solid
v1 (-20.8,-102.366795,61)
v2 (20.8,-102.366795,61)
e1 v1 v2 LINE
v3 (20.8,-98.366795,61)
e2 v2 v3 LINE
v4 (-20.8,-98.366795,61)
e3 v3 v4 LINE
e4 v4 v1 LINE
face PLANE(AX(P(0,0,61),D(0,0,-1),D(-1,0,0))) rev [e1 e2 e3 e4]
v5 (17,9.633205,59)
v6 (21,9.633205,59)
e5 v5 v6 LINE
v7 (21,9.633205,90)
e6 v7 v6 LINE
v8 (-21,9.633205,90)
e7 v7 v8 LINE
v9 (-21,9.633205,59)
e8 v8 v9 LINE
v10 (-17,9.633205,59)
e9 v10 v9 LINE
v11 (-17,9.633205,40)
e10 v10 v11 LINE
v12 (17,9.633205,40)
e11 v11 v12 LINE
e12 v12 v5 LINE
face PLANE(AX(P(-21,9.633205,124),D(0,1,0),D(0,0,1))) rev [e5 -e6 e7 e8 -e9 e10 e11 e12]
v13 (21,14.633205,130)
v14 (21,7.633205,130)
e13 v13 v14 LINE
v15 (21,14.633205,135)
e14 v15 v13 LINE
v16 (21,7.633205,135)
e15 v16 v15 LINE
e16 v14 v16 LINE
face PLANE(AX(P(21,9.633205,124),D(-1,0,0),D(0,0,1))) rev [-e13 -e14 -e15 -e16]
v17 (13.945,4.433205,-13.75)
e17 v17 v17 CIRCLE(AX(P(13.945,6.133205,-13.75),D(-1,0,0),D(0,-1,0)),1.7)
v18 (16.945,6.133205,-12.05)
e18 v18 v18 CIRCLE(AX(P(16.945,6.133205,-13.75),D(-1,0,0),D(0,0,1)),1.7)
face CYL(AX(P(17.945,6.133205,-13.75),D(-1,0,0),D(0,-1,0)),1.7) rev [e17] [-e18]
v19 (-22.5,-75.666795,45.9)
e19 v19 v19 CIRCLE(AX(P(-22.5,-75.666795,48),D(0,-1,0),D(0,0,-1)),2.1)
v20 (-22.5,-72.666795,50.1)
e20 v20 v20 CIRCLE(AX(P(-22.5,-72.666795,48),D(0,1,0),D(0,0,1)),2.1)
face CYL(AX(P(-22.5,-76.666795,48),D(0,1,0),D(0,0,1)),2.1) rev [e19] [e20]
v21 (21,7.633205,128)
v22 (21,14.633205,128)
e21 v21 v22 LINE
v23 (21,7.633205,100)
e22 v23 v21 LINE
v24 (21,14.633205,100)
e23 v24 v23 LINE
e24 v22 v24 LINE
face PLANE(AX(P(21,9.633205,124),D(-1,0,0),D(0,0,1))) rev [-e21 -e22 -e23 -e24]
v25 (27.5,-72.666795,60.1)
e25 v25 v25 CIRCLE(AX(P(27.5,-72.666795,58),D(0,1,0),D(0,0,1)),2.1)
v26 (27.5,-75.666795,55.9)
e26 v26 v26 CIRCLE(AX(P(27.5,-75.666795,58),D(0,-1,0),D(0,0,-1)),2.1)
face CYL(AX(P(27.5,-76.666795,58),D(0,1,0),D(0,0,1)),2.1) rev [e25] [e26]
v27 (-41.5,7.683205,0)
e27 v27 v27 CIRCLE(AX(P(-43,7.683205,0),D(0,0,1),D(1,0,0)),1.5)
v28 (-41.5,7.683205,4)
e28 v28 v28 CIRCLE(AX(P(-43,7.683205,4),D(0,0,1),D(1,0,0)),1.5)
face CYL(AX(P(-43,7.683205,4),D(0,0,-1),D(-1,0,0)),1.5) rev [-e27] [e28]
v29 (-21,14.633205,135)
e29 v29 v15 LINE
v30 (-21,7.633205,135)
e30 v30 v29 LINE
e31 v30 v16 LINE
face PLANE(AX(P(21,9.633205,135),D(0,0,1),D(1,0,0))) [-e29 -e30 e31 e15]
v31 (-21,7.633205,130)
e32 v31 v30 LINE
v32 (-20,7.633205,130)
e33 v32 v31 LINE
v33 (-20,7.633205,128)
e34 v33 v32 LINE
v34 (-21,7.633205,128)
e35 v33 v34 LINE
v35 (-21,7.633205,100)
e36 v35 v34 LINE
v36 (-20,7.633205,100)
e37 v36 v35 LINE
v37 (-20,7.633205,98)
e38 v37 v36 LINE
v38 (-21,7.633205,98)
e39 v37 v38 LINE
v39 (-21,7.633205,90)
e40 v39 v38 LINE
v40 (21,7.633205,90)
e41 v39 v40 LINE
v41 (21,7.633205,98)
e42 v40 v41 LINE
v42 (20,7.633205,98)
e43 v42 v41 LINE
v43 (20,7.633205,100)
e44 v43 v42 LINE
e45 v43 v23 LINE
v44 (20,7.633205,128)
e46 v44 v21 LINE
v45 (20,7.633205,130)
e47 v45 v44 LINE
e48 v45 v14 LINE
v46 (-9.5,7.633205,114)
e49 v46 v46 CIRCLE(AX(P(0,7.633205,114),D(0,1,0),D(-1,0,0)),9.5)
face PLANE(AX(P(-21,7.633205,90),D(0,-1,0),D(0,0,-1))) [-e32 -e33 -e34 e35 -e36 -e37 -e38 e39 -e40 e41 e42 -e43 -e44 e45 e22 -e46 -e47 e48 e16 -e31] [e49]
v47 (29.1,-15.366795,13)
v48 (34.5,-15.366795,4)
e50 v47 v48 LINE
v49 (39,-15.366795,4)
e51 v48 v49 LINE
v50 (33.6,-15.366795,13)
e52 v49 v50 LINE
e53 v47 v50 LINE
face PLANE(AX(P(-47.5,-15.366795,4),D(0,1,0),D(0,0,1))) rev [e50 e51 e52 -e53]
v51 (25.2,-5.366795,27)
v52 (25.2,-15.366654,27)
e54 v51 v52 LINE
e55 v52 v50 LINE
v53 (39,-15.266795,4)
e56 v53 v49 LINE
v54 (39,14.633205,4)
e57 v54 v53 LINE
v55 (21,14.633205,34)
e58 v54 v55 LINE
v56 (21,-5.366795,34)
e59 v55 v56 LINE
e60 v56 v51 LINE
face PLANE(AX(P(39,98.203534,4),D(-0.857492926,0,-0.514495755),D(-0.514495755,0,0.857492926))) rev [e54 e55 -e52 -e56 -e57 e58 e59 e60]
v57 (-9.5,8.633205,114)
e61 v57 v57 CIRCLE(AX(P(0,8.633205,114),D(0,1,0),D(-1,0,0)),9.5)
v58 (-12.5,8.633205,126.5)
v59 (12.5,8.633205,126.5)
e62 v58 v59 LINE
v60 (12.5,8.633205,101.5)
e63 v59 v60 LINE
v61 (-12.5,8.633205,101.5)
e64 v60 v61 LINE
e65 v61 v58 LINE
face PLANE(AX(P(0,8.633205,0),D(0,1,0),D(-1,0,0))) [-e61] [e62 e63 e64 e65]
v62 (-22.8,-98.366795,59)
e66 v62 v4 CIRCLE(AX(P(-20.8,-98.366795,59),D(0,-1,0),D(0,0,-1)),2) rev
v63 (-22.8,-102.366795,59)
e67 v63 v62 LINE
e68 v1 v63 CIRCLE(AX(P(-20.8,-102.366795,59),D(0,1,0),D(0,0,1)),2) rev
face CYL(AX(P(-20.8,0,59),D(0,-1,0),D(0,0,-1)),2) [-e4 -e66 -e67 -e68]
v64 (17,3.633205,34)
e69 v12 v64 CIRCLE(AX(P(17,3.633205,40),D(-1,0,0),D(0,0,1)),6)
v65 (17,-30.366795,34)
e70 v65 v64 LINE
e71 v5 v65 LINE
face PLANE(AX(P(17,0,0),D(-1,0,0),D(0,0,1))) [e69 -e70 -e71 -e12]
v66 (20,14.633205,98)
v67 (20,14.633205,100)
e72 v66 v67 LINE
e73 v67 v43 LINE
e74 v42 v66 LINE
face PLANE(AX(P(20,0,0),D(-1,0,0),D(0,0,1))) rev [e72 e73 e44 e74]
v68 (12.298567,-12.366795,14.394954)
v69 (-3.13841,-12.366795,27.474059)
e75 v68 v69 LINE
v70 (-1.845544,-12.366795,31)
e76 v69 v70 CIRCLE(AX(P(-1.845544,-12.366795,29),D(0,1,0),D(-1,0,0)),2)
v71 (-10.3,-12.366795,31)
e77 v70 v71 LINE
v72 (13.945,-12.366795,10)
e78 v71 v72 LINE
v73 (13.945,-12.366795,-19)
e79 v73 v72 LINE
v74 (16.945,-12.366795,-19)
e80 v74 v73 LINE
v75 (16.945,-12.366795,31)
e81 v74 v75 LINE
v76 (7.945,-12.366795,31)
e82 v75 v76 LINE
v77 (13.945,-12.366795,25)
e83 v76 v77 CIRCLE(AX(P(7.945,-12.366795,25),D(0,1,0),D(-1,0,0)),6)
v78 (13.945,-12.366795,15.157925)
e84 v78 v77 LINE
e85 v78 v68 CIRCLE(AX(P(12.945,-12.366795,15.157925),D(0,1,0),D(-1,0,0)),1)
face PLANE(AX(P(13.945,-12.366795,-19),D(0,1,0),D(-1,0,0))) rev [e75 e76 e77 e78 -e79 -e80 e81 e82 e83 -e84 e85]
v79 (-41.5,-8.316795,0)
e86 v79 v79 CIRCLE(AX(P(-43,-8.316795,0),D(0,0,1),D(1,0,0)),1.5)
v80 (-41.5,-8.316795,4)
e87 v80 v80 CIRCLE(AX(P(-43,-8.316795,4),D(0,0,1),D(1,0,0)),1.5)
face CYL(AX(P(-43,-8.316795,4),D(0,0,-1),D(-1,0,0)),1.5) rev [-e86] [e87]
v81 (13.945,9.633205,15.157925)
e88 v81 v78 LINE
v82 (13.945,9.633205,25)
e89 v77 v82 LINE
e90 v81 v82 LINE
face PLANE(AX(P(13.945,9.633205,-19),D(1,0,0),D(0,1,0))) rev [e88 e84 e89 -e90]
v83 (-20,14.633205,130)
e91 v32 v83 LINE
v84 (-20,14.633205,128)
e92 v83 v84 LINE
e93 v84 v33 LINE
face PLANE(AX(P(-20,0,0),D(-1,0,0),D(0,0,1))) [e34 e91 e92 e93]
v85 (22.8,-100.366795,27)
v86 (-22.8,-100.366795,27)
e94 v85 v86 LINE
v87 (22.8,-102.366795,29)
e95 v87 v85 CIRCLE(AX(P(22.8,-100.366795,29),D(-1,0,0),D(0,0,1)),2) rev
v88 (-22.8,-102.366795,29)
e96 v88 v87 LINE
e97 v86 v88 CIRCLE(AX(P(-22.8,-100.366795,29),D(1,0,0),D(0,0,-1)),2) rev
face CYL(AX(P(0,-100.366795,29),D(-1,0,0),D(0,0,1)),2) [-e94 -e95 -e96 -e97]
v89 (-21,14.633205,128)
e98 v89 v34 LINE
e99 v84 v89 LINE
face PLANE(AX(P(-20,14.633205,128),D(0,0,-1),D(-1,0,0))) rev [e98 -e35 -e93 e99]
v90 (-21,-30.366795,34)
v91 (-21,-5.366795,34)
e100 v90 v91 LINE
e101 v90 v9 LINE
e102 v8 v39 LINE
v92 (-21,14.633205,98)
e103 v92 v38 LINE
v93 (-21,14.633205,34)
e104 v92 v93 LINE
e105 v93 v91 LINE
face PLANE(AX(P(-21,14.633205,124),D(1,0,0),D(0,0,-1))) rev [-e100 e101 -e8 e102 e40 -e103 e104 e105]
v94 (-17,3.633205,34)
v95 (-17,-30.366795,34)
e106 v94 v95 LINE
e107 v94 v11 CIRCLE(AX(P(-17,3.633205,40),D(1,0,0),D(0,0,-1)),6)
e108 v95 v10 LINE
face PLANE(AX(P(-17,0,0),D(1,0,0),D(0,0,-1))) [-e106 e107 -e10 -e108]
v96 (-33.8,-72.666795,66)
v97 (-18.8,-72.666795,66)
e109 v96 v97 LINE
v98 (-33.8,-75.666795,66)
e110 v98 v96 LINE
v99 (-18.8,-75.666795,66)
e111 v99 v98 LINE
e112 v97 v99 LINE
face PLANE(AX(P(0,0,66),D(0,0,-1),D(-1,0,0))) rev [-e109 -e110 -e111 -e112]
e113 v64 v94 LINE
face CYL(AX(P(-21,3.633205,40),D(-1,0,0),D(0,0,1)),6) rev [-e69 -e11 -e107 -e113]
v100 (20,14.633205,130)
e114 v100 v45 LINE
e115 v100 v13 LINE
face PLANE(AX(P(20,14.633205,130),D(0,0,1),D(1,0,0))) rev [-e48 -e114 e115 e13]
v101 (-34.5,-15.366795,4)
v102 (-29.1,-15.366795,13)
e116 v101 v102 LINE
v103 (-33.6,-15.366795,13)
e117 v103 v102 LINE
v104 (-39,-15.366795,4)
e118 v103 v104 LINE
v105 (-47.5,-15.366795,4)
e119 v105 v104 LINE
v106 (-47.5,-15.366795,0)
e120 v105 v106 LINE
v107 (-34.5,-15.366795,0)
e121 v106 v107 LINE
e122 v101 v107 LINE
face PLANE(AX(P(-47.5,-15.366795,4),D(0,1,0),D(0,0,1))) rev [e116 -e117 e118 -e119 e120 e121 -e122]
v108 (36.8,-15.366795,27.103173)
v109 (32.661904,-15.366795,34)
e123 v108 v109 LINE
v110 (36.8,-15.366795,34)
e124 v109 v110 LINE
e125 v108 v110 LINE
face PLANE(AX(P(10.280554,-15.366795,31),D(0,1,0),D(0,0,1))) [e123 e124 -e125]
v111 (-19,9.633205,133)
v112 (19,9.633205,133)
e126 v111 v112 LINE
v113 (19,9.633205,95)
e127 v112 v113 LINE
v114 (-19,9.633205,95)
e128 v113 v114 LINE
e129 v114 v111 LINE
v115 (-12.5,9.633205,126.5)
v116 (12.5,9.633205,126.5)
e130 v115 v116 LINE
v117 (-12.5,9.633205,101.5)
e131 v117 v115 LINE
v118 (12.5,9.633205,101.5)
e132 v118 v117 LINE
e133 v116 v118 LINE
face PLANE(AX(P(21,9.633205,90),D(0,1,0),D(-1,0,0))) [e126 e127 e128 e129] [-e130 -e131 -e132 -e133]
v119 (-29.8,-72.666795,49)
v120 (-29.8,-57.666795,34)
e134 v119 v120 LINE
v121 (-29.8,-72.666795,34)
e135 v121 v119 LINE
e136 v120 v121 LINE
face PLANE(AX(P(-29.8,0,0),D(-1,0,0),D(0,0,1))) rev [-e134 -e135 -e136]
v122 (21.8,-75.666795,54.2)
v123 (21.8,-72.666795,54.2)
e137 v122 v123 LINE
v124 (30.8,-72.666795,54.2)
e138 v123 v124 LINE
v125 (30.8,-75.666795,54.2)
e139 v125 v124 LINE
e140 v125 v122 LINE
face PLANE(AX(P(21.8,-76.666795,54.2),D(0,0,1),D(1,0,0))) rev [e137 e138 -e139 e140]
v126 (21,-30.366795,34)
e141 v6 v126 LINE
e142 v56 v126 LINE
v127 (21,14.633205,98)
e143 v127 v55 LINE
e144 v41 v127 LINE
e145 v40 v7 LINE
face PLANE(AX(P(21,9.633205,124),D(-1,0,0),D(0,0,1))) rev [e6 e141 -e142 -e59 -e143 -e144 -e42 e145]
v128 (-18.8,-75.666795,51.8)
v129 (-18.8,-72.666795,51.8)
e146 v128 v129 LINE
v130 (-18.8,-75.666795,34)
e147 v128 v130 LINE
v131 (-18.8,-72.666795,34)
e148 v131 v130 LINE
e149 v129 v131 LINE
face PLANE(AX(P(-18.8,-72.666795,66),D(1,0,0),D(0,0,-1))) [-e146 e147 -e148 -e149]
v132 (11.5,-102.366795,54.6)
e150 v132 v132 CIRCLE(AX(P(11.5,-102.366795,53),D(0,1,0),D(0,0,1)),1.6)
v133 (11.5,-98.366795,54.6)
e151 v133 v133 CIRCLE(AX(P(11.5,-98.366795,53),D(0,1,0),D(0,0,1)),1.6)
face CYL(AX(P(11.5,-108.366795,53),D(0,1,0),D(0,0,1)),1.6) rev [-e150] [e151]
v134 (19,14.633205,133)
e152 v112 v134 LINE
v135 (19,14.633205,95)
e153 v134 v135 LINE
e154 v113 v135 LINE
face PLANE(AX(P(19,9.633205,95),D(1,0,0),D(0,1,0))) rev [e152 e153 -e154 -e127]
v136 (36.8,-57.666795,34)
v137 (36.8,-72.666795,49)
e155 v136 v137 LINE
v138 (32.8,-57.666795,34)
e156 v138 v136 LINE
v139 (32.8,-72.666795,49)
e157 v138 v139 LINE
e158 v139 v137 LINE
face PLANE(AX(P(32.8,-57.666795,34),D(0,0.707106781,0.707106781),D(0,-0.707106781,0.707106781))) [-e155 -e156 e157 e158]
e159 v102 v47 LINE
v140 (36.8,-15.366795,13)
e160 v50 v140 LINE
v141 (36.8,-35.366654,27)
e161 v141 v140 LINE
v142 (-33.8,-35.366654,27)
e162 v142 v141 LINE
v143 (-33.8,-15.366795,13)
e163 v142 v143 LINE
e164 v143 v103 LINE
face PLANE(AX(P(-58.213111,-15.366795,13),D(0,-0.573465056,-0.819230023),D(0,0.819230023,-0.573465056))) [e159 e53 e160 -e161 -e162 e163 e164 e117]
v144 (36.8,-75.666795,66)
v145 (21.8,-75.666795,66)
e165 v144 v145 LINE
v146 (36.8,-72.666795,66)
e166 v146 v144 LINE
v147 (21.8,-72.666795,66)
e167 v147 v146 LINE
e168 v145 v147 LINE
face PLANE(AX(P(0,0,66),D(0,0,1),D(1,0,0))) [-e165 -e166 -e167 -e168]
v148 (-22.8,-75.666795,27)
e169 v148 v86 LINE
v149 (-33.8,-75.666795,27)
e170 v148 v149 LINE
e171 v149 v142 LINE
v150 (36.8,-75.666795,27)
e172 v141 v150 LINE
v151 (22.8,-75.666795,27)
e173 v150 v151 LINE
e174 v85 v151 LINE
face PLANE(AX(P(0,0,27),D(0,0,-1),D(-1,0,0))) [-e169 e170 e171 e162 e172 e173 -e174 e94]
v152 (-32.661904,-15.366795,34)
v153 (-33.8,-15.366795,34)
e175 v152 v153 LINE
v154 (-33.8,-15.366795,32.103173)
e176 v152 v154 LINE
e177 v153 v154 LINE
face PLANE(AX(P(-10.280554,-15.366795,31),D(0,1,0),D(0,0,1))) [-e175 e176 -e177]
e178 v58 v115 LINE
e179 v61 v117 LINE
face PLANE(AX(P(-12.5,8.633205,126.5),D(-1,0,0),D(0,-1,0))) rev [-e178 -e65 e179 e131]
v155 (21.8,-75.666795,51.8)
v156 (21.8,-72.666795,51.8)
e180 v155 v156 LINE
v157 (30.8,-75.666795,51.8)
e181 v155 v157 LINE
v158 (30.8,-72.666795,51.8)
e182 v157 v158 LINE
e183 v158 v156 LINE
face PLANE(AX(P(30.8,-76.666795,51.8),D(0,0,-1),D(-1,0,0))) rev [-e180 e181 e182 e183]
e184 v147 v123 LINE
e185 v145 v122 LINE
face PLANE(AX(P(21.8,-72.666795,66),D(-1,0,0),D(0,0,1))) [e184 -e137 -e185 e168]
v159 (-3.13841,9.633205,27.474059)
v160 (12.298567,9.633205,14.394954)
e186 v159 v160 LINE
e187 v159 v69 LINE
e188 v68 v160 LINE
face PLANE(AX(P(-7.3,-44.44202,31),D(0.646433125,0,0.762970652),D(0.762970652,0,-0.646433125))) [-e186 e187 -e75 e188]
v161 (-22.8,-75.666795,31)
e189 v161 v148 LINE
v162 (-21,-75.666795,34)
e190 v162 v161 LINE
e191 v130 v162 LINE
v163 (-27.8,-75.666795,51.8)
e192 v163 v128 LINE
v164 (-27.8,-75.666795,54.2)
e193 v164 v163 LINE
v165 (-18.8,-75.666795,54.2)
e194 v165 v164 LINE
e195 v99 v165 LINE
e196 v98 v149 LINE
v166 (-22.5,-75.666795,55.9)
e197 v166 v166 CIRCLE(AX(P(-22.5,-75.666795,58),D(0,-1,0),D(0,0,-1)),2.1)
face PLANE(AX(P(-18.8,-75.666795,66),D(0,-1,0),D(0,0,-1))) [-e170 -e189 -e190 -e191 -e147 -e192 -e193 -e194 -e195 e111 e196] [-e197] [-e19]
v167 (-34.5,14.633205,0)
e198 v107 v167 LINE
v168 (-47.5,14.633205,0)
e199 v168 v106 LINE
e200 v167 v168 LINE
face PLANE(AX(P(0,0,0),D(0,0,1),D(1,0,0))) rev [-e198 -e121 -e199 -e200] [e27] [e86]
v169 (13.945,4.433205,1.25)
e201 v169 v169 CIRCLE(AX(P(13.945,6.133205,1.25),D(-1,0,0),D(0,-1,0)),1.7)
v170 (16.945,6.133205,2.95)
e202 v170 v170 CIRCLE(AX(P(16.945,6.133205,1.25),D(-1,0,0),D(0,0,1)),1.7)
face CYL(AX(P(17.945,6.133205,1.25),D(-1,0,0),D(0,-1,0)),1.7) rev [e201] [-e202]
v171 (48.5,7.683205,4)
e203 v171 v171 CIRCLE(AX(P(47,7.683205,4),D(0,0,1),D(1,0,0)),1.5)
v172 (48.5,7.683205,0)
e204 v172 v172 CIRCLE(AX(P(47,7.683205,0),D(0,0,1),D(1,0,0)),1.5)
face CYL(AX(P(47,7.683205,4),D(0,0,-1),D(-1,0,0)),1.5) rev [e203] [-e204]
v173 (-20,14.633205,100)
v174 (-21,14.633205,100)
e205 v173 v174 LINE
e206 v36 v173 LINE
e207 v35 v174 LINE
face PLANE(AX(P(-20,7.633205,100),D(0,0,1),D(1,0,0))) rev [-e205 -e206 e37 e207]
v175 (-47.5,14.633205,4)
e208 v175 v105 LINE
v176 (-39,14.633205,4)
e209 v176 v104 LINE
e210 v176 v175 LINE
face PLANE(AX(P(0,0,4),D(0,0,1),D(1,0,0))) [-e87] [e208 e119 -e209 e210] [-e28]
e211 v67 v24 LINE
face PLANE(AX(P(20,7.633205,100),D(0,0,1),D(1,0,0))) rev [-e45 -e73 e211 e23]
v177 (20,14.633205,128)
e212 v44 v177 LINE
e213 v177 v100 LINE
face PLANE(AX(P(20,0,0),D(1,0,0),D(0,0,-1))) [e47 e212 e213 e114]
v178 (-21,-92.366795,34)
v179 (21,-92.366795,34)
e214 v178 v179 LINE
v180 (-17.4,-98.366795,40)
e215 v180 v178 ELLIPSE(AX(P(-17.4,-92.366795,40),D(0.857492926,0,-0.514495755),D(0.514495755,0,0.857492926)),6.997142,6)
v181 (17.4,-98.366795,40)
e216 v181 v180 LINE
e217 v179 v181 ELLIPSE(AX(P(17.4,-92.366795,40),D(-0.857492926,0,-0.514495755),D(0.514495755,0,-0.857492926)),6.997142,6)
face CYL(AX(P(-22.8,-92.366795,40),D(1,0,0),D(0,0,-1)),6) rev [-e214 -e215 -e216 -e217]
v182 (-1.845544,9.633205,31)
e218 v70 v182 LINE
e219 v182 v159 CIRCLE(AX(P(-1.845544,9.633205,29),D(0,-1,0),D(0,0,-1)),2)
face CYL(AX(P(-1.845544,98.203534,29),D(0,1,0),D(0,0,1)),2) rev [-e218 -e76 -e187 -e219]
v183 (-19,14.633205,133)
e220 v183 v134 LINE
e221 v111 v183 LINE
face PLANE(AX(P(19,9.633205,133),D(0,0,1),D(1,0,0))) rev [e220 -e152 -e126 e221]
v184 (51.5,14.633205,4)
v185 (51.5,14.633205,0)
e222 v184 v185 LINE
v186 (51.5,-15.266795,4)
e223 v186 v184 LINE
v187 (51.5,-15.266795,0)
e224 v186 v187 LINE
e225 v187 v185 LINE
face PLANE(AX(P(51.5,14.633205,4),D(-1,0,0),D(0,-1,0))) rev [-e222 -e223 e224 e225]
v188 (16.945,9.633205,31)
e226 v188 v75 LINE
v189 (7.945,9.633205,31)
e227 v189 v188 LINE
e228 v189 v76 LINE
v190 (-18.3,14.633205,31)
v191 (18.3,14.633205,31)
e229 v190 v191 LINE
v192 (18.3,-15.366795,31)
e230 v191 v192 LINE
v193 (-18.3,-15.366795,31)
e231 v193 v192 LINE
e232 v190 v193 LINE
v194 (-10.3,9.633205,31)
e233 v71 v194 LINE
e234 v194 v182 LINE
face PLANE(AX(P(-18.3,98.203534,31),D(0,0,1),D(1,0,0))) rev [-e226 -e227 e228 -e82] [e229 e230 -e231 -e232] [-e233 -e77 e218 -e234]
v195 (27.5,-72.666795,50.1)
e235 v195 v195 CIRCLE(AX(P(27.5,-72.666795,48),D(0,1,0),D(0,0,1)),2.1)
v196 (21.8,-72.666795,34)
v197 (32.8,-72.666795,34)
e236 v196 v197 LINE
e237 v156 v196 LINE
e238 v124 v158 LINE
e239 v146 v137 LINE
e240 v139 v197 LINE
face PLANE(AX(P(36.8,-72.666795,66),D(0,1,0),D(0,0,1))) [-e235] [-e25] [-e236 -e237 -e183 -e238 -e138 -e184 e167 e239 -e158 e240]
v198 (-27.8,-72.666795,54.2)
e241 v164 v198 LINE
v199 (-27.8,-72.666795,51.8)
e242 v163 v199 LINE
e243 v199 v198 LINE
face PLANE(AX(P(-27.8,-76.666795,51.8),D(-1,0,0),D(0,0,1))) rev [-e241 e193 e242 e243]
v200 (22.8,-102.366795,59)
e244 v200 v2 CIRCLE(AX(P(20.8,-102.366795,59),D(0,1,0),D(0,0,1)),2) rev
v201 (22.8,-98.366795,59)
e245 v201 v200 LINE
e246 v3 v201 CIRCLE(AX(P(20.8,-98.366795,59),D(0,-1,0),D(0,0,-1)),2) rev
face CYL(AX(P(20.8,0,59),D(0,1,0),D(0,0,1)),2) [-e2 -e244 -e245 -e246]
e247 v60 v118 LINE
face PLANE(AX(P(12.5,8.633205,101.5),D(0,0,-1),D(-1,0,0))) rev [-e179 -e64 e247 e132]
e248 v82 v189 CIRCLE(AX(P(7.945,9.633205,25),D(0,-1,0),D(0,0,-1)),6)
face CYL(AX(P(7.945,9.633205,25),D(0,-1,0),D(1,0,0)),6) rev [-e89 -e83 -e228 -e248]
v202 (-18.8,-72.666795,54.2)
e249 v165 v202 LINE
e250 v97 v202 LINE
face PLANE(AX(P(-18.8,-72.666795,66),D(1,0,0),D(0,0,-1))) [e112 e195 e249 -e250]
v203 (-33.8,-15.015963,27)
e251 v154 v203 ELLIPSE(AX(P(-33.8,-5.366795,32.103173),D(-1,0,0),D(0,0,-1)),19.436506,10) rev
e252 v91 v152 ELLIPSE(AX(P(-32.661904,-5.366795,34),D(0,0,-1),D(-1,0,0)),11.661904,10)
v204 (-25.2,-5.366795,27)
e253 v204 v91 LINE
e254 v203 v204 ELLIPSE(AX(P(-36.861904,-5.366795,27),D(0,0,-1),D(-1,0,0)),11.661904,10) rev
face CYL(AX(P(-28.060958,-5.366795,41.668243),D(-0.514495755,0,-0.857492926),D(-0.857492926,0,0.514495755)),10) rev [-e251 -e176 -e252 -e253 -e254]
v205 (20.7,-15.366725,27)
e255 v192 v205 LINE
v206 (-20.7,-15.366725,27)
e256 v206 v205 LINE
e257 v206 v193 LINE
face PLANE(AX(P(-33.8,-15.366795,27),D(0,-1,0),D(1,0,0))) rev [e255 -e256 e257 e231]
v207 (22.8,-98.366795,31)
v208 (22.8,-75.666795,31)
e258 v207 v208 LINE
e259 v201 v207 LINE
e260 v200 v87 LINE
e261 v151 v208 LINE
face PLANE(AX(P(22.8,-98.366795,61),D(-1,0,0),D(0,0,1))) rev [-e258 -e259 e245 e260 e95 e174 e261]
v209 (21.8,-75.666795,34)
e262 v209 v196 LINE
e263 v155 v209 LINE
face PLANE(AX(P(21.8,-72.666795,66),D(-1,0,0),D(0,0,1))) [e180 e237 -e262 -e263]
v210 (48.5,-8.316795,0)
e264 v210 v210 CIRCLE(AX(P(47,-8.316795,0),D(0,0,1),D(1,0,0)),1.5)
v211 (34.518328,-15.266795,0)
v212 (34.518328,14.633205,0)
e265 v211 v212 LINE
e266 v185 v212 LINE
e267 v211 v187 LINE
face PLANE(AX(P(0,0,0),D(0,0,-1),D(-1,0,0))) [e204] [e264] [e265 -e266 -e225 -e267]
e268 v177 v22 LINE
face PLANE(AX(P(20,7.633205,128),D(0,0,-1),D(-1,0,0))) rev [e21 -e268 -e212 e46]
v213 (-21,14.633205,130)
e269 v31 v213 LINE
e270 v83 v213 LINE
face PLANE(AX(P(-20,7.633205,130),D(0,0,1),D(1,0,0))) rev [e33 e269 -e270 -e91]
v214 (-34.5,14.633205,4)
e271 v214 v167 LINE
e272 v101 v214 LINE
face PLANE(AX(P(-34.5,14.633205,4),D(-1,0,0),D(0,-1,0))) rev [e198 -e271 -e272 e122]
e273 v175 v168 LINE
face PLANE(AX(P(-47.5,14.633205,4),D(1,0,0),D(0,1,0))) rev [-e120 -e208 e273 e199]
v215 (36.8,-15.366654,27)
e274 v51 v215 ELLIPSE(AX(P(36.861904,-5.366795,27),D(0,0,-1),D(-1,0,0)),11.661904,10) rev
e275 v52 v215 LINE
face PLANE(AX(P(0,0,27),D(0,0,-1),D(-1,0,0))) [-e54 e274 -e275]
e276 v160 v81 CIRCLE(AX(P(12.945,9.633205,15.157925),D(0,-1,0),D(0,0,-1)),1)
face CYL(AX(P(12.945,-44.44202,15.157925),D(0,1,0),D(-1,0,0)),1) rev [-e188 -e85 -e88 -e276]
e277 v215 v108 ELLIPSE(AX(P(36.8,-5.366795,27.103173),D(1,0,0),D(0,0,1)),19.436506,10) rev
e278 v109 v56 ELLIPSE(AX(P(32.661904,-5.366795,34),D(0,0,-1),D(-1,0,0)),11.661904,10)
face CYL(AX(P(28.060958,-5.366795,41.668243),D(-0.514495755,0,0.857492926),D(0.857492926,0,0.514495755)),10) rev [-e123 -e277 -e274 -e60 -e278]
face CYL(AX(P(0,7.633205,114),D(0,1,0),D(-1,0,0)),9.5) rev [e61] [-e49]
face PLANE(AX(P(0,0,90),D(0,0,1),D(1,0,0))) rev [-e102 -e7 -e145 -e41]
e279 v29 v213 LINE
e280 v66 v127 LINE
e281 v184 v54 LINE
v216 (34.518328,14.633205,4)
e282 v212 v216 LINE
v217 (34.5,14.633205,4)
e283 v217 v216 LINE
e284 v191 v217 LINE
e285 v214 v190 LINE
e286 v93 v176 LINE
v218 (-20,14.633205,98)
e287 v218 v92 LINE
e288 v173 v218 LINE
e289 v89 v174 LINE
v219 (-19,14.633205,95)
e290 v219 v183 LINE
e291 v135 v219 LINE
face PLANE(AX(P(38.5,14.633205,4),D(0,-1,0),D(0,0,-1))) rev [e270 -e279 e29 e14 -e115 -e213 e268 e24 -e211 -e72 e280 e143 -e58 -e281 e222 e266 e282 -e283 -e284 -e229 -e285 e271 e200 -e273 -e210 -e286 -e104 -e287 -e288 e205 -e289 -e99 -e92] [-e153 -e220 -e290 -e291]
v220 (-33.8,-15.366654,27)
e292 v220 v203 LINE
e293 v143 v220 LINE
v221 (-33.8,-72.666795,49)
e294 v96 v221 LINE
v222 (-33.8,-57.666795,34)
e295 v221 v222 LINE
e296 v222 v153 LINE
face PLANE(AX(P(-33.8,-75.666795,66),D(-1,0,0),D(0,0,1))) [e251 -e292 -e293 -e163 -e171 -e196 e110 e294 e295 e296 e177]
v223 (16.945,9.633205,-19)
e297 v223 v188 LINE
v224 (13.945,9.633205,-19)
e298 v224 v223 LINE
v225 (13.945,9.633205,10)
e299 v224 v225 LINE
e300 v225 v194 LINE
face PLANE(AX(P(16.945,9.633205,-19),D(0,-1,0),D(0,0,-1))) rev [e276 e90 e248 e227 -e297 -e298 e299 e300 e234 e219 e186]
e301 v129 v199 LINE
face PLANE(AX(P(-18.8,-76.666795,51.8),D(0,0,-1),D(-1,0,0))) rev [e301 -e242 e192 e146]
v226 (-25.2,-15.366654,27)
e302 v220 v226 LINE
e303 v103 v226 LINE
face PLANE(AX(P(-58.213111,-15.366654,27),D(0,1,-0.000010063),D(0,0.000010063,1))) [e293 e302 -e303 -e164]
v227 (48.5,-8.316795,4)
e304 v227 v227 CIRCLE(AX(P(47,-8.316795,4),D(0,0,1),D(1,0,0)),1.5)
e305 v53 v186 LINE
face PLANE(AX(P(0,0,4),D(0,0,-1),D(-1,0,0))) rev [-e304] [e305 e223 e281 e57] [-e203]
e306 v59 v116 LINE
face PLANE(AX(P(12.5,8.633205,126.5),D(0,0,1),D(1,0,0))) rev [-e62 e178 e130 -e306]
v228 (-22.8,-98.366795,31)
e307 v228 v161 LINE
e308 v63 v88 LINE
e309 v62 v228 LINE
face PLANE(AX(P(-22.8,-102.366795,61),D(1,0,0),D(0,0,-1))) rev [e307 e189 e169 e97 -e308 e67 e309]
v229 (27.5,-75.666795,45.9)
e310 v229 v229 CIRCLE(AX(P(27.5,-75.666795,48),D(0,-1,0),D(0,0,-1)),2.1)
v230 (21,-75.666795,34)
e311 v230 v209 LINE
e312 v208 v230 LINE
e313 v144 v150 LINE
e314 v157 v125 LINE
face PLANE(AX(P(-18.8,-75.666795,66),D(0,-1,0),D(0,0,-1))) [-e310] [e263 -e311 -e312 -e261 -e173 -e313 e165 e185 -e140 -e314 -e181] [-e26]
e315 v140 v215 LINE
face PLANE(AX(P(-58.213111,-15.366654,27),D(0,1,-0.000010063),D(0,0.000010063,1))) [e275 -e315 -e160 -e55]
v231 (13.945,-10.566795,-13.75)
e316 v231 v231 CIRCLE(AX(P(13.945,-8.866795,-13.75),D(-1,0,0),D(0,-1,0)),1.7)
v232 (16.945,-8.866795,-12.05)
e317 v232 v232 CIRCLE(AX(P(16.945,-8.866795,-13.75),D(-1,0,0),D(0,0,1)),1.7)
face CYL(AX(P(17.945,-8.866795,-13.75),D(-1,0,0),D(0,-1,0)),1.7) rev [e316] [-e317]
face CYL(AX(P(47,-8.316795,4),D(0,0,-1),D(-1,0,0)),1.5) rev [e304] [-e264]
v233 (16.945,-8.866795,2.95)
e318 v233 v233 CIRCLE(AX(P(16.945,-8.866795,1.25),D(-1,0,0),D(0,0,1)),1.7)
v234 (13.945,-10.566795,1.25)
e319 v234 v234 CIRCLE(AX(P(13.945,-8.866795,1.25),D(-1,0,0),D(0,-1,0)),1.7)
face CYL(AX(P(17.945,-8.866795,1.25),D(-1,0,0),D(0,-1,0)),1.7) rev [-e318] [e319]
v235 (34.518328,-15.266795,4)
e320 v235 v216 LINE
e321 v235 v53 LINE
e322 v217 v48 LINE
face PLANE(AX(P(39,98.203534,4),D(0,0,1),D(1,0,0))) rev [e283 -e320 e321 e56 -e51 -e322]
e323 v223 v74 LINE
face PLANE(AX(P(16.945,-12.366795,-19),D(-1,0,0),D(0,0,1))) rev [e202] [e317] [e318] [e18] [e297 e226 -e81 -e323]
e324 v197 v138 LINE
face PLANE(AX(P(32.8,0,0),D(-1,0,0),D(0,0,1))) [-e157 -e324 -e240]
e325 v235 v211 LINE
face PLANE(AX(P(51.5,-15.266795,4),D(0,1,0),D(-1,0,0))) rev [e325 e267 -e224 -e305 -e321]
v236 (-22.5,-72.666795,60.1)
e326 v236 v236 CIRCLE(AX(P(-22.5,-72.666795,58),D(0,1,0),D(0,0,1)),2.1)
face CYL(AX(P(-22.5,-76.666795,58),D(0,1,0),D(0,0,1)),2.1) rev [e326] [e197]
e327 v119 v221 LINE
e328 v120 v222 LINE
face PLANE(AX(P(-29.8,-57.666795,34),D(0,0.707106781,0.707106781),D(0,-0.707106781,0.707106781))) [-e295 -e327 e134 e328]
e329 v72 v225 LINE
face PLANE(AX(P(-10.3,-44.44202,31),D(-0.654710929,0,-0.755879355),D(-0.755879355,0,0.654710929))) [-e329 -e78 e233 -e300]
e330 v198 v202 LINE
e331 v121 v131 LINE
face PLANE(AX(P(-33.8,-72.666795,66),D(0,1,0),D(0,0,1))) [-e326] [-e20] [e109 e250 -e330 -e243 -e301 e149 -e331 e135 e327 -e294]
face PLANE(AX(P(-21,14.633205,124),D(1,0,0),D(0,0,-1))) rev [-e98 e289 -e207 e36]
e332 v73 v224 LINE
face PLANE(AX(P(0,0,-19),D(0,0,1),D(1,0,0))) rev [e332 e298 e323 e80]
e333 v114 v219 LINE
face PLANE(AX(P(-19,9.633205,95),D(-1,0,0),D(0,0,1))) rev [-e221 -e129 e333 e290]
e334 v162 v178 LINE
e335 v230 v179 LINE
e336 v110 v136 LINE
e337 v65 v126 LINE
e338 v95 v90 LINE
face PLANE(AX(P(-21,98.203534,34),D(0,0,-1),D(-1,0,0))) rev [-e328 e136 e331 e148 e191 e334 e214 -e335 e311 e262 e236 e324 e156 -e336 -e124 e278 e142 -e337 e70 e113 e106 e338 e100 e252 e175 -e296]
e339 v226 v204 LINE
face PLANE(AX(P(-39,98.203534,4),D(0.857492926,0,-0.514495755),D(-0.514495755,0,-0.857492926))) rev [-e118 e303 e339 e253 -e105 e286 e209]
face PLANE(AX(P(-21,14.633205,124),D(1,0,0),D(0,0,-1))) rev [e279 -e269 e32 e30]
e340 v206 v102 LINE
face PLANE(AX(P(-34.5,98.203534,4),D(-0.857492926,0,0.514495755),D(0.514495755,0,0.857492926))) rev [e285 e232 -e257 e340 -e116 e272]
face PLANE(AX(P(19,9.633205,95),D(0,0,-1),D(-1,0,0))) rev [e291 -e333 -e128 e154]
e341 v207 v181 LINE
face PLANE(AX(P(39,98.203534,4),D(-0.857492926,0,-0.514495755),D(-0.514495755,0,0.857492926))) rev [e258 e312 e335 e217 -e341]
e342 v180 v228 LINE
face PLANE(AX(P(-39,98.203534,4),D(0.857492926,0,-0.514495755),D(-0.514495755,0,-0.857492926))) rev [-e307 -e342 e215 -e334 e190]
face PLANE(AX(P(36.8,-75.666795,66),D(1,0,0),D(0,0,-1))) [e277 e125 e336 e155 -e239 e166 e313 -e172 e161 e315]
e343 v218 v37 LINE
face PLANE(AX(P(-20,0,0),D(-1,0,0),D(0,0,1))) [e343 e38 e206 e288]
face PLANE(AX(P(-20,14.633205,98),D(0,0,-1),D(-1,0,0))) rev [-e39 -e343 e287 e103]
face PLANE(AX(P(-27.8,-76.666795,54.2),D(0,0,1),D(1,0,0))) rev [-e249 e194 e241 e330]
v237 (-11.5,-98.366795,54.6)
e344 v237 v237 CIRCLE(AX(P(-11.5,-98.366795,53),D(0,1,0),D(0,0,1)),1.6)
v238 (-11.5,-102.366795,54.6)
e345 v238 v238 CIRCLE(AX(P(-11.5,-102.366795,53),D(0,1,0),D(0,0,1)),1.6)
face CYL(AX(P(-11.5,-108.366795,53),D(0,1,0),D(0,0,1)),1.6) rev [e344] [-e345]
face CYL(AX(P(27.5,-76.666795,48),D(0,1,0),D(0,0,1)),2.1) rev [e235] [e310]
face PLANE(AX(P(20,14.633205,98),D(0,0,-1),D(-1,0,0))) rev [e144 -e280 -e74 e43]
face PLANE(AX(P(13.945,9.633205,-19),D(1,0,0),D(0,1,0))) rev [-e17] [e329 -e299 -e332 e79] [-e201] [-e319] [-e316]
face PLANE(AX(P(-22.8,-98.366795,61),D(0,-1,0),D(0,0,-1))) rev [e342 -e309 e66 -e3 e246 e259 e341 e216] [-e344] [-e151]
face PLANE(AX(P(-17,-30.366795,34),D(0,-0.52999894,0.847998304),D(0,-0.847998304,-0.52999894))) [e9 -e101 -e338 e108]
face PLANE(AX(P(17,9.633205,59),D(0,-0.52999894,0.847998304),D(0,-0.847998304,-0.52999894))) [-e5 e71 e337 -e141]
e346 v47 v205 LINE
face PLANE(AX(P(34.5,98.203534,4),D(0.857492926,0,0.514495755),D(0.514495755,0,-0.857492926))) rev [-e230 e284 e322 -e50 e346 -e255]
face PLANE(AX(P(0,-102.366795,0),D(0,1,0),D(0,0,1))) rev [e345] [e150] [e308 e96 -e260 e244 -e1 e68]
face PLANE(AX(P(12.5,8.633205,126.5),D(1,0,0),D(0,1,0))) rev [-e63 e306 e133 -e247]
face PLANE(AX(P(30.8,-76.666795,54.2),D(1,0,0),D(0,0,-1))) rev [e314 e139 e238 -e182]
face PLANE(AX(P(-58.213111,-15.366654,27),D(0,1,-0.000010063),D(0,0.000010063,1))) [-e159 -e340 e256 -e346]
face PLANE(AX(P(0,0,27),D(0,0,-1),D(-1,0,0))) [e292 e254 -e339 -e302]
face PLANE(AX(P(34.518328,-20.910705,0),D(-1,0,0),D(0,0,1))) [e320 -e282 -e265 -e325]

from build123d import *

# Parameters (mm, degrees)
SKETCH_1_W                  = 13
SKETCH_1_H                  = 30
SKETCH_1_R                  = 1.5
EXTRUDE_1_DEPTH             = 4
SKETCH_1_H_2                = 29.9
EXTRUDE_1_2_DEPTH           = 4
EXTRUDE_2_REACH             = 55.892
EXTRUDE_2_DIRECTION_2_REACH = 55.892
EXTRUDE_4_DEPTH             = 87
EXTRUDE_START               = -3
SKETCH_8_W                  = 45.6
SKETCH_8_H                  = 4
EXTRUDE_5_DEPTH             = 30
FILLET_1_R                  = 6
SKETCH_10_W                 = 3
SKETCH_10_H                 = 22
EXTRUDE_6_DEPTH             = 50
SKETCH_13_R                 = 1.7
CUT_EXTRUDE_3_DEPTH         = 4
FILLET_3_R                  = 6
SKETCH_14_R                 = 1.6
CUT_EXTRUDE_4_DEPTH         = 10
SKETCH_22_W                 = 42
SKETCH_22_H                 = 5
EXTRUDE_13_DEPTH            = 90
SKETCH_23_W                 = 42
SKETCH_23_H                 = 42
SKETCH_23_W_2               = 38
SKETCH_23_H_2               = 38
EXTRUDE_14_DEPTH            = 5
SKETCH_24_W                 = 38
SKETCH_24_H                 = 38
CUT_EXTRUDE_6_DEPTH         = 5
EXTRUDE_17_DEPTH            = 40
EXTRUDE_17_DEPTH_BACK       = 5
SKETCH_26_W                 = 42
SKETCH_26_H                 = 2
SKETCH_27_W                 = 25
SKETCH_27_H                 = 25
CUT_EXTRUDE_7_DEPTH         = 1
SKETCH_28_R                 = 9.5
CUT_EXTRUDE_8_DEPTH         = 1
EXTRUDE_18_DEPTH            = 4
EXTRUDE_19_DEPTH            = 4
FILLET_4_R                  = 6
SKETCH_31_W                 = 2
SKETCH_31_H                 = 7
CUT_EXTRUDE_9_DEPTH         = 1
SKETCH_32_W                 = 2
SKETCH_32_H                 = 7
CUT_EXTRUDE_10_DEPTH        = 1
SKETCH_34_W                 = 3.981671923
SKETCH_34_H                 = 4
EXTRUDE_20_DEPTH            = 29.9
SKETCH_15_W                 = 15
SKETCH_15_H                 = 3
EXTRUDE_29_DEPTH            = 35
EXTRUDE_30_REACH            = 191.684
SKETCH_45_W                 = 3
SKETCH_45_H                 = 50
EXTRUDE_31_REACH            = 191.236
SKETCH_46_W                 = 3
SKETCH_46_H                 = 50
SKETCH_47_R                 = 2.1
SKETCH_47_W                 = 9
SKETCH_47_H                 = 2.4
CUT_EXTRUDE_13_DEPTH        = 4
EXTRUDE_32_DEPTH            = 4
EXTRUDE_33_DEPTH            = 4
EXTRUDE_34_DEPTH            = 22
FILLET_9_R                  = 2
FILLET_10_R                 = 1
EXTRUDE_35_REACH            = 191.236
SKETCH_51_W                 = 3
SKETCH_51_H                 = 10.3
EXTRUDE_36_REACH            = 191.684
SKETCH_52_W                 = 3
SKETCH_52_H                 = 10.3
SKETCH_55_W                 = 70.6
SKETCH_55_H                 = 60.3
EXTRUDE_39_DEPTH            = 4
FILLET_11_R                 = 10
EXTRUDE_START_2             = -70.6
EXTRUDE_41_DEPTH            = 70.6
SKETCH_61_W                 = 4
SKETCH_61_H                 = 26.7
EXTRUDE_42_DEPTH            = 45.6
FILLET_12_R                 = 2


with BuildPart() as part:
    # 草图1 → 凸台-拉伸1 (new body)
    with BuildSketch(Plane.XY):
        with Locations((-41, -0.366795367)):
            Rectangle(SKETCH_1_W, SKETCH_1_H)
        with Locations((-43, 7.683204633)):
            Circle(SKETCH_1_R, mode=Mode.SUBTRACT)
        with Locations((-43, -8.316795367)):
            Circle(SKETCH_1_R, mode=Mode.SUBTRACT)
    extrude(amount=EXTRUDE_1_DEPTH)

    # 凸台-拉伸2: up to this face of the body (flat: up to its plane)
    extrude_2_end = Plane(part.part.faces().sort_by_distance((-41, 14.633204633, 2))[0])
    # 草图2 → 凸台-拉伸2 (add, up to the picked face)
    with BuildSketch(Plane(origin=(0, 0, 0), x_dir=(1, 0, 0), z_dir=(0, 1, 0)), mode=Mode.PRIVATE) as extrude_2_sk1:
        Polygon((-39, -4), (-21, -34), (21, -34), (39, -4), (34.5, -4), (18.3, -31), (-18.3, -31), (-34.5, -4), align=None)
    extrude_2_tool1 = split(extrude(extrude_2_sk1.sketch, amount=EXTRUDE_2_REACH, mode=Mode.PRIVATE), bisect_by=extrude_2_end, keep=Keep.BOTH, mode=Mode.PRIVATE)
    add(extrude_2_tool1.solids().sort_by(Axis((-29.28339, 0, 18.570034), (0, 1, 0)))[0])

    # 凸台-拉伸2 direction 2: up to this face of the body (flat: up to its plane)
    extrude_2_direction_2_end = Plane(part.part.faces().sort_by_distance((-41, -15.366795367, 2))[0])
    # 草图2 → 凸台-拉伸2 direction 2 (add, up to the picked face)
    with BuildSketch(Plane(origin=(0, 0, 0), x_dir=(1, 0, 0), z_dir=(0, 1, 0)), mode=Mode.PRIVATE) as extrude_2_direction_2_sk1:
        Polygon((-39, -4), (-21, -34), (21, -34), (39, -4), (34.5, -4), (18.3, -31), (-18.3, -31), (-34.5, -4), align=None)
    extrude_2_direction_2_tool1 = split(extrude(extrude_2_direction_2_sk1.sketch, amount=-EXTRUDE_2_DIRECTION_2_REACH, mode=Mode.PRIVATE), bisect_by=extrude_2_direction_2_end, keep=Keep.BOTH, mode=Mode.PRIVATE)
    add(extrude_2_direction_2_tool1.solids().sort_by(Axis((-29.28339, 0, 18.570034), (0, -1, 0)))[0])

    # 草图6 → 凸台-拉伸4 (add)
    with BuildSketch(Plane.XZ.offset(15.366795367)):
        Polygon((-21, 31), (21.070673513, 31), (22.8, 31), (21, 34), (-21, 34), (-22.8, 31), align=None)
    extrude(amount=EXTRUDE_4_DEPTH)

    # 草图8 → 凸台-拉伸5 (add)
    with BuildSketch(Plane.XY.offset(34).offset(EXTRUDE_START)):
        with Locations((0, -100.366795367)):
            Rectangle(SKETCH_8_W, SKETCH_8_H)
    extrude(amount=EXTRUDE_5_DEPTH)

    # 圆角1
    fillet_1_edges = [part.edges().sort_by_distance(p)[0] for p in [
        (0, -98.366795367, 34),
    ]]
    fillet(fillet_1_edges, radius=FILLET_1_R)

    # 草图10 → 凸台-拉伸6 (add)
    with BuildSketch(Plane(origin=(0, 0, 31), x_dir=(-1, 0, 0), z_dir=(0, 0, -1))):
        with Locations((-15.445, -1.366795367)):
            Rectangle(SKETCH_10_W, SKETCH_10_H)
    extrude(amount=EXTRUDE_6_DEPTH)

    # 草图13 → 切除-拉伸3 (cut)
    with BuildSketch(Plane.ZY.offset(-13.945)):
        with Locations(Location((-13.75, 6.133204633, 0), (0, 0, 270))):
            Circle(SKETCH_13_R)
        with Locations(Location((-13.75, -8.866795367, 0), (0, 0, 270))):
            Circle(SKETCH_13_R)
        with Locations(Location((1.25, 6.133204633, 0), (0, 0, 270))):
            Circle(SKETCH_13_R)
        with Locations(Location((1.25, -8.866795367, 0), (0, 0, 270))):
            Circle(SKETCH_13_R)
    extrude(amount=-CUT_EXTRUDE_3_DEPTH, mode=Mode.SUBTRACT)

    # 圆角3
    fillet_3_edges = [part.edges().sort_by_distance(p)[0] for p in [
        (13.945, -1.366795367, 31),
    ]]
    fillet(fillet_3_edges, radius=FILLET_3_R)

    # 草图14 → 切除-拉伸4 (cut)
    with BuildSketch(Plane(origin=(0, -98.366795367, 0), x_dir=(1, 0, 0), z_dir=(0, 1, 0))):
        with Locations(Location((-11.5, -53, 0), (0, 0, 270))):
            Circle(SKETCH_14_R)
        with Locations(Location((11.5, -53, 0), (0, 0, 270))):
            Circle(SKETCH_14_R)
    extrude(amount=-CUT_EXTRUDE_4_DEPTH, mode=Mode.SUBTRACT)

    # 草图22 → 凸台-拉伸13 (add)
    with BuildSketch(Plane.XY.offset(34)):
        with Locations((0, 12.133204633)):
            Rectangle(SKETCH_22_W, SKETCH_22_H)
    extrude(amount=EXTRUDE_13_DEPTH)

    # 草图23 → 凸台-拉伸14 (add)
    with BuildSketch(Plane(origin=(0, 14.633204633, 0), x_dir=(1, 0, 0), z_dir=(0, 1, 0))):
        with Locations((0, -114)):
            Rectangle(SKETCH_23_W, SKETCH_23_H)
        with Locations((0, -114)):
            Rectangle(SKETCH_23_W_2, SKETCH_23_H_2, mode=Mode.SUBTRACT)
    extrude(amount=-EXTRUDE_14_DEPTH)

    # 草图24 → 切除-拉伸6 (cut)
    with BuildSketch(Plane(origin=(0, 14.633204633, 0), x_dir=(1, 0, 0), z_dir=(0, 1, 0))):
        with Locations((0, -114)):
            Rectangle(SKETCH_24_W, SKETCH_24_H)
    extrude(amount=-CUT_EXTRUDE_6_DEPTH, mode=Mode.SUBTRACT)

    # 草图26 → 凸台-拉伸17 (add, two sides: drawn at the far end of the back side and taken through both)
    with BuildSketch(Plane.XY.offset(95).offset(-EXTRUDE_17_DEPTH_BACK)):
        with Locations((0, 8.633204633)):
            Rectangle(SKETCH_26_W, SKETCH_26_H)
    extrude(amount=EXTRUDE_17_DEPTH + EXTRUDE_17_DEPTH_BACK)

    # 草图27 → 切除-拉伸7 (cut)
    with BuildSketch(Plane(origin=(0, 9.633204633, 0), x_dir=(1, 0, 0), z_dir=(0, 1, 0))):
        with Locations((0, -114)):
            Rectangle(SKETCH_27_W, SKETCH_27_H)
    extrude(amount=-CUT_EXTRUDE_7_DEPTH, mode=Mode.SUBTRACT)

    # 草图28 → 切除-拉伸8 (cut)
    with BuildSketch(Plane(origin=(0, 8.633204633, 0), x_dir=(1, 0, 0), z_dir=(0, 1, 0))):
        with Locations(Location((0, -114, 0), (0, 0, 180))):
            Circle(SKETCH_28_R)
    extrude(amount=-CUT_EXTRUDE_8_DEPTH, mode=Mode.SUBTRACT)

    # 草图29 → 凸台-拉伸18 (add)
    with BuildSketch(Plane.ZY.offset(21)):
        Polygon((34, -30.366795367), (59, 9.633204633), (34, 9.633204633), align=None)
    extrude(amount=-EXTRUDE_18_DEPTH)

    # 草图30 → 凸台-拉伸19 (add)
    with BuildSketch(Plane(origin=(21, 0, 0), x_dir=(0, 0, -1), z_dir=(1, 0, 0))):
        Polygon((-59, 9.633204633), (-34, -30.366795367), (-34, 9.633204633), align=None)
    extrude(amount=-EXTRUDE_19_DEPTH)

    # 圆角4
    fillet_4_edges = [part.edges().sort_by_distance(p)[0] for p in [
        (0, 9.633204633, 34),
    ]]
    fillet(fillet_4_edges, radius=FILLET_4_R)

    # 草图31 → 切除-拉伸9 (cut)
    with BuildSketch(Plane.ZY.offset(21)):
        with Locations((99, 11.133204633)):
            Rectangle(SKETCH_31_W, SKETCH_31_H)
        with Locations((129, 11.133204633)):
            Rectangle(SKETCH_31_W, SKETCH_31_H)
    extrude(amount=-CUT_EXTRUDE_9_DEPTH, mode=Mode.SUBTRACT)

    # 草图32 → 切除-拉伸10 (cut)
    with BuildSketch(Plane(origin=(21, 0, 0), x_dir=(0, 0, -1), z_dir=(1, 0, 0))):
        with Locations((-99, 11.133204633)):
            Rectangle(SKETCH_32_W, SKETCH_32_H)
        with Locations((-129, 11.133204633)):
            Rectangle(SKETCH_32_W, SKETCH_32_H)
    extrude(amount=-CUT_EXTRUDE_10_DEPTH, mode=Mode.SUBTRACT)



with BuildPart() as body_2:
    # 草图1 → Extrude 1 2 (new body)
    with BuildSketch(Plane.XY):
        with Locations((45, -0.316795367)):
            Rectangle(SKETCH_1_W, SKETCH_1_H_2)
        with Locations((47, -8.316795367)):
            Circle(SKETCH_1_R, mode=Mode.SUBTRACT)
        with Locations((47, 7.683204633)):
            Circle(SKETCH_1_R, mode=Mode.SUBTRACT)
    extrude(amount=EXTRUDE_1_2_DEPTH)


with BuildPart() as part_1:
    add(part.part)

    add(body_2.part)  # 凸台-拉伸20 merges body 2
    # 草图34 → 凸台-拉伸20 (add)
    with BuildSketch(Plane(origin=(0, 14.633204633, 0), x_dir=(1, 0, 0), z_dir=(0, 1, 0))):
        with Locations((36.509164039, -2)):
            Rectangle(SKETCH_34_W, SKETCH_34_H)
    extrude(amount=-EXTRUDE_20_DEPTH)

    # 草图15 → 凸台-拉伸29 (add)
    with BuildSketch(Plane(origin=(0, 0, 31), x_dir=(-1, 0, 0), z_dir=(0, 0, -1))):
        with Locations((26.3, -74.166795367)):
            Rectangle(SKETCH_15_W, SKETCH_15_H)
        with Locations((-29.3, -74.166795367)):
            Rectangle(SKETCH_15_W, SKETCH_15_H)
    extrude(amount=-EXTRUDE_29_DEPTH)

    # 凸台-拉伸30: up to this plane
    extrude_30_end = Plane(origin=(-39, 98.203534296, 4), z_dir=(0.857492925712544, 0, -0.5144957554275267))
    # 草图45 → 凸台-拉伸30 (add, up to the surface)
    with BuildSketch(Plane.ZY.offset(33.8), mode=Mode.PRIVATE) as extrude_30_sk1:
        with Locations((32.5, -50.666795367)):
            Rectangle(SKETCH_45_W, SKETCH_45_H)
    extrude_30_tool1 = split(extrude(extrude_30_sk1.sketch, amount=-EXTRUDE_30_REACH, mode=Mode.PRIVATE), bisect_by=extrude_30_end, keep=Keep.BOTH, mode=Mode.PRIVATE)
    add(extrude_30_tool1.solids().sort_by_distance((-33.8, -50.666795, 32.5))[0])

    # 凸台-拉伸31: up to this plane
    extrude_31_end = Plane(origin=(39, 98.203534296, 4), z_dir=(-0.8574929257125442, 0, -0.5144957554275266))
    # 草图46 → 凸台-拉伸31 (add, up to the surface)
    with BuildSketch(Plane(origin=(36.8, 0, 0), x_dir=(0, 0, -1), z_dir=(1, 0, 0)), mode=Mode.PRIVATE) as extrude_31_sk1:
        with Locations((-32.5, -50.666795367)):
            Rectangle(SKETCH_46_W, SKETCH_46_H)
    extrude_31_tool1 = split(extrude(extrude_31_sk1.sketch, amount=-EXTRUDE_31_REACH, mode=Mode.PRIVATE), bisect_by=extrude_31_end, keep=Keep.BOTH, mode=Mode.PRIVATE)
    add(extrude_31_tool1.solids().sort_by_distance((36.8, -50.666795, 32.5))[0])

    # 草图47 → 切除-拉伸13 (cut)
    with BuildSketch(Plane(origin=(0, -72.666795367, 0), x_dir=(1, 0, 0), z_dir=(0, 1, 0))):
        with Locations(Location((-22.5, -48, 0), (0, 0, 270))):
            Circle(SKETCH_47_R)
        with Locations(Location((-22.5, -58, 0), (0, 0, 270))):
            Circle(SKETCH_47_R)
        with Locations(Location((27.5, -48, 0), (0, 0, 270))):
            Circle(SKETCH_47_R)
        with Locations(Location((27.5, -58, 0), (0, 0, 270))):
            Circle(SKETCH_47_R)
        with Locations((26.3, -53)):
            Rectangle(SKETCH_47_W, SKETCH_47_H)
        with Locations((-23.3, -53)):
            Rectangle(SKETCH_47_W, SKETCH_47_H)
    extrude(amount=-CUT_EXTRUDE_13_DEPTH, mode=Mode.SUBTRACT)

    # 草图48 → 凸台-拉伸32 (add)
    with BuildSketch(Plane.ZY.offset(33.8)):
        Polygon((34, -57.666795367), (49, -72.666795367), (34, -72.666795367), align=None)
    extrude(amount=-EXTRUDE_32_DEPTH)

    # 草图49 → 凸台-拉伸33 (add)
    with BuildSketch(Plane(origin=(36.8, 0, 0), x_dir=(0, 0, -1), z_dir=(1, 0, 0))):
        Polygon((-34, -57.666795367), (-49, -72.666795367), (-34, -72.666795367), align=None)
    extrude(amount=-EXTRUDE_33_DEPTH)

    # 草图50 → 凸台-拉伸34 (add)
    with BuildSketch(Plane(origin=(0, 9.633204633, 0), x_dir=(1, 0, 0), z_dir=(0, 1, 0))):
        Polygon((-7.3, -31), (13.945, -13), (13.945, -10), (-10.3, -31), align=None)
    extrude(amount=-EXTRUDE_34_DEPTH)

    # 圆角9
    fillet_9_edges = [part_1.edges().sort_by_distance(p)[0] for p in [
        (-7.3, -1.366795367, 31),
    ]]
    fillet(fillet_9_edges, radius=FILLET_9_R)

    # 圆角10
    fillet_10_edges = [part_1.edges().sort_by_distance(p)[0] for p in [
        (13.945, -1.366795367, 13),
    ]]
    fillet(fillet_10_edges, radius=FILLET_10_R)

    # 凸台-拉伸35: up to this plane
    extrude_35_end = Plane(origin=(39, 98.203534296, 4), z_dir=(-0.8574929257125442, 0, -0.5144957554275266))
    # 草图51 → 凸台-拉伸35 (add, up to the surface)
    with BuildSketch(Plane(origin=(36.8, 0, 0), x_dir=(0, 0, -1), z_dir=(1, 0, 0)), mode=Mode.PRIVATE) as extrude_35_sk1:
        with Locations((-32.5, -20.516795367)):
            Rectangle(SKETCH_51_W, SKETCH_51_H)
    extrude_35_tool1 = split(extrude(extrude_35_sk1.sketch, amount=-EXTRUDE_35_REACH, mode=Mode.PRIVATE), bisect_by=extrude_35_end, keep=Keep.BOTH, mode=Mode.PRIVATE)
    add(extrude_35_tool1.solids().sort_by_distance((36.8, -20.516795, 32.5))[0])

    # 凸台-拉伸36: up to this plane
    extrude_36_end = Plane(origin=(-39, 98.203534296, 4), z_dir=(0.857492925712544, 0, -0.5144957554275267))
    # 草图52 → 凸台-拉伸36 (add, up to the surface)
    with BuildSketch(Plane.ZY.offset(33.8), mode=Mode.PRIVATE) as extrude_36_sk1:
        with Locations((32.5, -20.516795367)):
            Rectangle(SKETCH_52_W, SKETCH_52_H)
    extrude_36_tool1 = split(extrude(extrude_36_sk1.sketch, amount=-EXTRUDE_36_REACH, mode=Mode.PRIVATE), bisect_by=extrude_36_end, keep=Keep.BOTH, mode=Mode.PRIVATE)
    add(extrude_36_tool1.solids().sort_by_distance((-33.8, -20.516795, 32.5))[0])

    # 草图55 → 凸台-拉伸39 (add)
    with BuildSketch(Plane(origin=(0, 0, 31), x_dir=(-1, 0, 0), z_dir=(0, 0, -1))):
        with Locations((-1.5, -45.516795367)):
            Rectangle(SKETCH_55_W, SKETCH_55_H)
    extrude(amount=EXTRUDE_39_DEPTH)

    # 圆角11
    # the kernel refuses this fillet: 10 mm, written as the material it adds along each edge
    with BuildSketch(Plane(origin=(-38.062393886, -15.366795367, 5.562676857), x_dir=(0, 1, 0), z_dir=(0.5144957554275272, 0, 0.8574929257125439))) as fillet_11_piece_1_section:
        with BuildLine():
            CenterArc((FILLET_11_R, FILLET_11_R), FILLET_11_R, 180, 90)
            Line((0, FILLET_11_R), (0, 0))
            Line((0, 0), (FILLET_11_R, 0))
        make_face()
    fillet_11_piece_1 = extrude(amount=58.163332653, mode=Mode.PRIVATE)
    fillet_11_piece_1 = split(fillet_11_piece_1, bisect_by=Plane(origin=(-25.682376011, -13.127518809, 27), z_dir=(0, 0, 1)), keep=Keep.TOP, mode=Mode.PRIVATE)
    fillet_11_piece_1 = split(fillet_11_piece_1, bisect_by=Plane(origin=(-33.8, -13.127518809, 30.506418383), z_dir=(1, 0, 0)), keep=Keep.TOP, mode=Mode.PRIVATE)
    fillet_11_piece_1 = split(fillet_11_piece_1, bisect_by=Plane(origin=(-25.682376011, -13.127518809, 34), z_dir=(0, 0, -1)), keep=Keep.TOP, mode=Mode.PRIVATE)
    add(fillet_11_piece_1)
    with BuildSketch(Plane(origin=(8.137606114, -15.366795367, 55.437323143), x_dir=(0, 1, 0), z_dir=(0.5144957554275269, 0, -0.8574929257125441))) as fillet_11_piece_2_section:
        with BuildLine():
            CenterArc((FILLET_11_R, FILLET_11_R), FILLET_11_R, 180, 90)
            Line((0, FILLET_11_R), (0, 0))
            Line((0, 0), (FILLET_11_R, 0))
        make_face()
    fillet_11_piece_2 = extrude(amount=58.163332653, mode=Mode.PRIVATE)
    fillet_11_piece_2 = split(fillet_11_piece_2, bisect_by=Plane(origin=(25.704895409, -13.133115976, 27), z_dir=(0, 0, 1)), keep=Keep.TOP, mode=Mode.PRIVATE)
    fillet_11_piece_2 = split(fillet_11_piece_2, bisect_by=Plane(origin=(36.8, -13.133115976, 30.500000002), z_dir=(-1, 0, 0)), keep=Keep.TOP, mode=Mode.PRIVATE)
    fillet_11_piece_2 = split(fillet_11_piece_2, bisect_by=Plane(origin=(25.704895409, -13.133115976, 34), z_dir=(0, 0, -1)), keep=Keep.TOP, mode=Mode.PRIVATE)
    add(fillet_11_piece_2)

    # 草图58 → 凸台-拉伸41 (add)
    with BuildSketch(Plane(origin=(36.8, 0, 0), x_dir=(0, 0, -1), z_dir=(1, 0, 0)).offset(EXTRUDE_START_2)):
        Polygon((-27, -15.366654481), (-13.000000001, -15.366795367), (-27, -35.366654481), align=None)
    extrude(amount=EXTRUDE_41_DEPTH)

    # 草图61 → 凸台-拉伸42 (add)
    with BuildSketch(Plane(origin=(22.8, 0, 0), x_dir=(0, 0, -1), z_dir=(1, 0, 0))):
        with Locations((-29, -89.016795367)):
            Rectangle(SKETCH_61_W, SKETCH_61_H)
    extrude(amount=-EXTRUDE_42_DEPTH)

    # 圆角12
    fillet_12_edges = [part_1.edges().sort_by_distance(p)[0] for p in [
        (22.8, -100.366795367, 61),
        (-22.8, -100.366795367, 61),
        (0, -102.366795367, 27),
    ]]
    fillet(fillet_12_edges, radius=FILLET_12_R)


solid = part_1.part
